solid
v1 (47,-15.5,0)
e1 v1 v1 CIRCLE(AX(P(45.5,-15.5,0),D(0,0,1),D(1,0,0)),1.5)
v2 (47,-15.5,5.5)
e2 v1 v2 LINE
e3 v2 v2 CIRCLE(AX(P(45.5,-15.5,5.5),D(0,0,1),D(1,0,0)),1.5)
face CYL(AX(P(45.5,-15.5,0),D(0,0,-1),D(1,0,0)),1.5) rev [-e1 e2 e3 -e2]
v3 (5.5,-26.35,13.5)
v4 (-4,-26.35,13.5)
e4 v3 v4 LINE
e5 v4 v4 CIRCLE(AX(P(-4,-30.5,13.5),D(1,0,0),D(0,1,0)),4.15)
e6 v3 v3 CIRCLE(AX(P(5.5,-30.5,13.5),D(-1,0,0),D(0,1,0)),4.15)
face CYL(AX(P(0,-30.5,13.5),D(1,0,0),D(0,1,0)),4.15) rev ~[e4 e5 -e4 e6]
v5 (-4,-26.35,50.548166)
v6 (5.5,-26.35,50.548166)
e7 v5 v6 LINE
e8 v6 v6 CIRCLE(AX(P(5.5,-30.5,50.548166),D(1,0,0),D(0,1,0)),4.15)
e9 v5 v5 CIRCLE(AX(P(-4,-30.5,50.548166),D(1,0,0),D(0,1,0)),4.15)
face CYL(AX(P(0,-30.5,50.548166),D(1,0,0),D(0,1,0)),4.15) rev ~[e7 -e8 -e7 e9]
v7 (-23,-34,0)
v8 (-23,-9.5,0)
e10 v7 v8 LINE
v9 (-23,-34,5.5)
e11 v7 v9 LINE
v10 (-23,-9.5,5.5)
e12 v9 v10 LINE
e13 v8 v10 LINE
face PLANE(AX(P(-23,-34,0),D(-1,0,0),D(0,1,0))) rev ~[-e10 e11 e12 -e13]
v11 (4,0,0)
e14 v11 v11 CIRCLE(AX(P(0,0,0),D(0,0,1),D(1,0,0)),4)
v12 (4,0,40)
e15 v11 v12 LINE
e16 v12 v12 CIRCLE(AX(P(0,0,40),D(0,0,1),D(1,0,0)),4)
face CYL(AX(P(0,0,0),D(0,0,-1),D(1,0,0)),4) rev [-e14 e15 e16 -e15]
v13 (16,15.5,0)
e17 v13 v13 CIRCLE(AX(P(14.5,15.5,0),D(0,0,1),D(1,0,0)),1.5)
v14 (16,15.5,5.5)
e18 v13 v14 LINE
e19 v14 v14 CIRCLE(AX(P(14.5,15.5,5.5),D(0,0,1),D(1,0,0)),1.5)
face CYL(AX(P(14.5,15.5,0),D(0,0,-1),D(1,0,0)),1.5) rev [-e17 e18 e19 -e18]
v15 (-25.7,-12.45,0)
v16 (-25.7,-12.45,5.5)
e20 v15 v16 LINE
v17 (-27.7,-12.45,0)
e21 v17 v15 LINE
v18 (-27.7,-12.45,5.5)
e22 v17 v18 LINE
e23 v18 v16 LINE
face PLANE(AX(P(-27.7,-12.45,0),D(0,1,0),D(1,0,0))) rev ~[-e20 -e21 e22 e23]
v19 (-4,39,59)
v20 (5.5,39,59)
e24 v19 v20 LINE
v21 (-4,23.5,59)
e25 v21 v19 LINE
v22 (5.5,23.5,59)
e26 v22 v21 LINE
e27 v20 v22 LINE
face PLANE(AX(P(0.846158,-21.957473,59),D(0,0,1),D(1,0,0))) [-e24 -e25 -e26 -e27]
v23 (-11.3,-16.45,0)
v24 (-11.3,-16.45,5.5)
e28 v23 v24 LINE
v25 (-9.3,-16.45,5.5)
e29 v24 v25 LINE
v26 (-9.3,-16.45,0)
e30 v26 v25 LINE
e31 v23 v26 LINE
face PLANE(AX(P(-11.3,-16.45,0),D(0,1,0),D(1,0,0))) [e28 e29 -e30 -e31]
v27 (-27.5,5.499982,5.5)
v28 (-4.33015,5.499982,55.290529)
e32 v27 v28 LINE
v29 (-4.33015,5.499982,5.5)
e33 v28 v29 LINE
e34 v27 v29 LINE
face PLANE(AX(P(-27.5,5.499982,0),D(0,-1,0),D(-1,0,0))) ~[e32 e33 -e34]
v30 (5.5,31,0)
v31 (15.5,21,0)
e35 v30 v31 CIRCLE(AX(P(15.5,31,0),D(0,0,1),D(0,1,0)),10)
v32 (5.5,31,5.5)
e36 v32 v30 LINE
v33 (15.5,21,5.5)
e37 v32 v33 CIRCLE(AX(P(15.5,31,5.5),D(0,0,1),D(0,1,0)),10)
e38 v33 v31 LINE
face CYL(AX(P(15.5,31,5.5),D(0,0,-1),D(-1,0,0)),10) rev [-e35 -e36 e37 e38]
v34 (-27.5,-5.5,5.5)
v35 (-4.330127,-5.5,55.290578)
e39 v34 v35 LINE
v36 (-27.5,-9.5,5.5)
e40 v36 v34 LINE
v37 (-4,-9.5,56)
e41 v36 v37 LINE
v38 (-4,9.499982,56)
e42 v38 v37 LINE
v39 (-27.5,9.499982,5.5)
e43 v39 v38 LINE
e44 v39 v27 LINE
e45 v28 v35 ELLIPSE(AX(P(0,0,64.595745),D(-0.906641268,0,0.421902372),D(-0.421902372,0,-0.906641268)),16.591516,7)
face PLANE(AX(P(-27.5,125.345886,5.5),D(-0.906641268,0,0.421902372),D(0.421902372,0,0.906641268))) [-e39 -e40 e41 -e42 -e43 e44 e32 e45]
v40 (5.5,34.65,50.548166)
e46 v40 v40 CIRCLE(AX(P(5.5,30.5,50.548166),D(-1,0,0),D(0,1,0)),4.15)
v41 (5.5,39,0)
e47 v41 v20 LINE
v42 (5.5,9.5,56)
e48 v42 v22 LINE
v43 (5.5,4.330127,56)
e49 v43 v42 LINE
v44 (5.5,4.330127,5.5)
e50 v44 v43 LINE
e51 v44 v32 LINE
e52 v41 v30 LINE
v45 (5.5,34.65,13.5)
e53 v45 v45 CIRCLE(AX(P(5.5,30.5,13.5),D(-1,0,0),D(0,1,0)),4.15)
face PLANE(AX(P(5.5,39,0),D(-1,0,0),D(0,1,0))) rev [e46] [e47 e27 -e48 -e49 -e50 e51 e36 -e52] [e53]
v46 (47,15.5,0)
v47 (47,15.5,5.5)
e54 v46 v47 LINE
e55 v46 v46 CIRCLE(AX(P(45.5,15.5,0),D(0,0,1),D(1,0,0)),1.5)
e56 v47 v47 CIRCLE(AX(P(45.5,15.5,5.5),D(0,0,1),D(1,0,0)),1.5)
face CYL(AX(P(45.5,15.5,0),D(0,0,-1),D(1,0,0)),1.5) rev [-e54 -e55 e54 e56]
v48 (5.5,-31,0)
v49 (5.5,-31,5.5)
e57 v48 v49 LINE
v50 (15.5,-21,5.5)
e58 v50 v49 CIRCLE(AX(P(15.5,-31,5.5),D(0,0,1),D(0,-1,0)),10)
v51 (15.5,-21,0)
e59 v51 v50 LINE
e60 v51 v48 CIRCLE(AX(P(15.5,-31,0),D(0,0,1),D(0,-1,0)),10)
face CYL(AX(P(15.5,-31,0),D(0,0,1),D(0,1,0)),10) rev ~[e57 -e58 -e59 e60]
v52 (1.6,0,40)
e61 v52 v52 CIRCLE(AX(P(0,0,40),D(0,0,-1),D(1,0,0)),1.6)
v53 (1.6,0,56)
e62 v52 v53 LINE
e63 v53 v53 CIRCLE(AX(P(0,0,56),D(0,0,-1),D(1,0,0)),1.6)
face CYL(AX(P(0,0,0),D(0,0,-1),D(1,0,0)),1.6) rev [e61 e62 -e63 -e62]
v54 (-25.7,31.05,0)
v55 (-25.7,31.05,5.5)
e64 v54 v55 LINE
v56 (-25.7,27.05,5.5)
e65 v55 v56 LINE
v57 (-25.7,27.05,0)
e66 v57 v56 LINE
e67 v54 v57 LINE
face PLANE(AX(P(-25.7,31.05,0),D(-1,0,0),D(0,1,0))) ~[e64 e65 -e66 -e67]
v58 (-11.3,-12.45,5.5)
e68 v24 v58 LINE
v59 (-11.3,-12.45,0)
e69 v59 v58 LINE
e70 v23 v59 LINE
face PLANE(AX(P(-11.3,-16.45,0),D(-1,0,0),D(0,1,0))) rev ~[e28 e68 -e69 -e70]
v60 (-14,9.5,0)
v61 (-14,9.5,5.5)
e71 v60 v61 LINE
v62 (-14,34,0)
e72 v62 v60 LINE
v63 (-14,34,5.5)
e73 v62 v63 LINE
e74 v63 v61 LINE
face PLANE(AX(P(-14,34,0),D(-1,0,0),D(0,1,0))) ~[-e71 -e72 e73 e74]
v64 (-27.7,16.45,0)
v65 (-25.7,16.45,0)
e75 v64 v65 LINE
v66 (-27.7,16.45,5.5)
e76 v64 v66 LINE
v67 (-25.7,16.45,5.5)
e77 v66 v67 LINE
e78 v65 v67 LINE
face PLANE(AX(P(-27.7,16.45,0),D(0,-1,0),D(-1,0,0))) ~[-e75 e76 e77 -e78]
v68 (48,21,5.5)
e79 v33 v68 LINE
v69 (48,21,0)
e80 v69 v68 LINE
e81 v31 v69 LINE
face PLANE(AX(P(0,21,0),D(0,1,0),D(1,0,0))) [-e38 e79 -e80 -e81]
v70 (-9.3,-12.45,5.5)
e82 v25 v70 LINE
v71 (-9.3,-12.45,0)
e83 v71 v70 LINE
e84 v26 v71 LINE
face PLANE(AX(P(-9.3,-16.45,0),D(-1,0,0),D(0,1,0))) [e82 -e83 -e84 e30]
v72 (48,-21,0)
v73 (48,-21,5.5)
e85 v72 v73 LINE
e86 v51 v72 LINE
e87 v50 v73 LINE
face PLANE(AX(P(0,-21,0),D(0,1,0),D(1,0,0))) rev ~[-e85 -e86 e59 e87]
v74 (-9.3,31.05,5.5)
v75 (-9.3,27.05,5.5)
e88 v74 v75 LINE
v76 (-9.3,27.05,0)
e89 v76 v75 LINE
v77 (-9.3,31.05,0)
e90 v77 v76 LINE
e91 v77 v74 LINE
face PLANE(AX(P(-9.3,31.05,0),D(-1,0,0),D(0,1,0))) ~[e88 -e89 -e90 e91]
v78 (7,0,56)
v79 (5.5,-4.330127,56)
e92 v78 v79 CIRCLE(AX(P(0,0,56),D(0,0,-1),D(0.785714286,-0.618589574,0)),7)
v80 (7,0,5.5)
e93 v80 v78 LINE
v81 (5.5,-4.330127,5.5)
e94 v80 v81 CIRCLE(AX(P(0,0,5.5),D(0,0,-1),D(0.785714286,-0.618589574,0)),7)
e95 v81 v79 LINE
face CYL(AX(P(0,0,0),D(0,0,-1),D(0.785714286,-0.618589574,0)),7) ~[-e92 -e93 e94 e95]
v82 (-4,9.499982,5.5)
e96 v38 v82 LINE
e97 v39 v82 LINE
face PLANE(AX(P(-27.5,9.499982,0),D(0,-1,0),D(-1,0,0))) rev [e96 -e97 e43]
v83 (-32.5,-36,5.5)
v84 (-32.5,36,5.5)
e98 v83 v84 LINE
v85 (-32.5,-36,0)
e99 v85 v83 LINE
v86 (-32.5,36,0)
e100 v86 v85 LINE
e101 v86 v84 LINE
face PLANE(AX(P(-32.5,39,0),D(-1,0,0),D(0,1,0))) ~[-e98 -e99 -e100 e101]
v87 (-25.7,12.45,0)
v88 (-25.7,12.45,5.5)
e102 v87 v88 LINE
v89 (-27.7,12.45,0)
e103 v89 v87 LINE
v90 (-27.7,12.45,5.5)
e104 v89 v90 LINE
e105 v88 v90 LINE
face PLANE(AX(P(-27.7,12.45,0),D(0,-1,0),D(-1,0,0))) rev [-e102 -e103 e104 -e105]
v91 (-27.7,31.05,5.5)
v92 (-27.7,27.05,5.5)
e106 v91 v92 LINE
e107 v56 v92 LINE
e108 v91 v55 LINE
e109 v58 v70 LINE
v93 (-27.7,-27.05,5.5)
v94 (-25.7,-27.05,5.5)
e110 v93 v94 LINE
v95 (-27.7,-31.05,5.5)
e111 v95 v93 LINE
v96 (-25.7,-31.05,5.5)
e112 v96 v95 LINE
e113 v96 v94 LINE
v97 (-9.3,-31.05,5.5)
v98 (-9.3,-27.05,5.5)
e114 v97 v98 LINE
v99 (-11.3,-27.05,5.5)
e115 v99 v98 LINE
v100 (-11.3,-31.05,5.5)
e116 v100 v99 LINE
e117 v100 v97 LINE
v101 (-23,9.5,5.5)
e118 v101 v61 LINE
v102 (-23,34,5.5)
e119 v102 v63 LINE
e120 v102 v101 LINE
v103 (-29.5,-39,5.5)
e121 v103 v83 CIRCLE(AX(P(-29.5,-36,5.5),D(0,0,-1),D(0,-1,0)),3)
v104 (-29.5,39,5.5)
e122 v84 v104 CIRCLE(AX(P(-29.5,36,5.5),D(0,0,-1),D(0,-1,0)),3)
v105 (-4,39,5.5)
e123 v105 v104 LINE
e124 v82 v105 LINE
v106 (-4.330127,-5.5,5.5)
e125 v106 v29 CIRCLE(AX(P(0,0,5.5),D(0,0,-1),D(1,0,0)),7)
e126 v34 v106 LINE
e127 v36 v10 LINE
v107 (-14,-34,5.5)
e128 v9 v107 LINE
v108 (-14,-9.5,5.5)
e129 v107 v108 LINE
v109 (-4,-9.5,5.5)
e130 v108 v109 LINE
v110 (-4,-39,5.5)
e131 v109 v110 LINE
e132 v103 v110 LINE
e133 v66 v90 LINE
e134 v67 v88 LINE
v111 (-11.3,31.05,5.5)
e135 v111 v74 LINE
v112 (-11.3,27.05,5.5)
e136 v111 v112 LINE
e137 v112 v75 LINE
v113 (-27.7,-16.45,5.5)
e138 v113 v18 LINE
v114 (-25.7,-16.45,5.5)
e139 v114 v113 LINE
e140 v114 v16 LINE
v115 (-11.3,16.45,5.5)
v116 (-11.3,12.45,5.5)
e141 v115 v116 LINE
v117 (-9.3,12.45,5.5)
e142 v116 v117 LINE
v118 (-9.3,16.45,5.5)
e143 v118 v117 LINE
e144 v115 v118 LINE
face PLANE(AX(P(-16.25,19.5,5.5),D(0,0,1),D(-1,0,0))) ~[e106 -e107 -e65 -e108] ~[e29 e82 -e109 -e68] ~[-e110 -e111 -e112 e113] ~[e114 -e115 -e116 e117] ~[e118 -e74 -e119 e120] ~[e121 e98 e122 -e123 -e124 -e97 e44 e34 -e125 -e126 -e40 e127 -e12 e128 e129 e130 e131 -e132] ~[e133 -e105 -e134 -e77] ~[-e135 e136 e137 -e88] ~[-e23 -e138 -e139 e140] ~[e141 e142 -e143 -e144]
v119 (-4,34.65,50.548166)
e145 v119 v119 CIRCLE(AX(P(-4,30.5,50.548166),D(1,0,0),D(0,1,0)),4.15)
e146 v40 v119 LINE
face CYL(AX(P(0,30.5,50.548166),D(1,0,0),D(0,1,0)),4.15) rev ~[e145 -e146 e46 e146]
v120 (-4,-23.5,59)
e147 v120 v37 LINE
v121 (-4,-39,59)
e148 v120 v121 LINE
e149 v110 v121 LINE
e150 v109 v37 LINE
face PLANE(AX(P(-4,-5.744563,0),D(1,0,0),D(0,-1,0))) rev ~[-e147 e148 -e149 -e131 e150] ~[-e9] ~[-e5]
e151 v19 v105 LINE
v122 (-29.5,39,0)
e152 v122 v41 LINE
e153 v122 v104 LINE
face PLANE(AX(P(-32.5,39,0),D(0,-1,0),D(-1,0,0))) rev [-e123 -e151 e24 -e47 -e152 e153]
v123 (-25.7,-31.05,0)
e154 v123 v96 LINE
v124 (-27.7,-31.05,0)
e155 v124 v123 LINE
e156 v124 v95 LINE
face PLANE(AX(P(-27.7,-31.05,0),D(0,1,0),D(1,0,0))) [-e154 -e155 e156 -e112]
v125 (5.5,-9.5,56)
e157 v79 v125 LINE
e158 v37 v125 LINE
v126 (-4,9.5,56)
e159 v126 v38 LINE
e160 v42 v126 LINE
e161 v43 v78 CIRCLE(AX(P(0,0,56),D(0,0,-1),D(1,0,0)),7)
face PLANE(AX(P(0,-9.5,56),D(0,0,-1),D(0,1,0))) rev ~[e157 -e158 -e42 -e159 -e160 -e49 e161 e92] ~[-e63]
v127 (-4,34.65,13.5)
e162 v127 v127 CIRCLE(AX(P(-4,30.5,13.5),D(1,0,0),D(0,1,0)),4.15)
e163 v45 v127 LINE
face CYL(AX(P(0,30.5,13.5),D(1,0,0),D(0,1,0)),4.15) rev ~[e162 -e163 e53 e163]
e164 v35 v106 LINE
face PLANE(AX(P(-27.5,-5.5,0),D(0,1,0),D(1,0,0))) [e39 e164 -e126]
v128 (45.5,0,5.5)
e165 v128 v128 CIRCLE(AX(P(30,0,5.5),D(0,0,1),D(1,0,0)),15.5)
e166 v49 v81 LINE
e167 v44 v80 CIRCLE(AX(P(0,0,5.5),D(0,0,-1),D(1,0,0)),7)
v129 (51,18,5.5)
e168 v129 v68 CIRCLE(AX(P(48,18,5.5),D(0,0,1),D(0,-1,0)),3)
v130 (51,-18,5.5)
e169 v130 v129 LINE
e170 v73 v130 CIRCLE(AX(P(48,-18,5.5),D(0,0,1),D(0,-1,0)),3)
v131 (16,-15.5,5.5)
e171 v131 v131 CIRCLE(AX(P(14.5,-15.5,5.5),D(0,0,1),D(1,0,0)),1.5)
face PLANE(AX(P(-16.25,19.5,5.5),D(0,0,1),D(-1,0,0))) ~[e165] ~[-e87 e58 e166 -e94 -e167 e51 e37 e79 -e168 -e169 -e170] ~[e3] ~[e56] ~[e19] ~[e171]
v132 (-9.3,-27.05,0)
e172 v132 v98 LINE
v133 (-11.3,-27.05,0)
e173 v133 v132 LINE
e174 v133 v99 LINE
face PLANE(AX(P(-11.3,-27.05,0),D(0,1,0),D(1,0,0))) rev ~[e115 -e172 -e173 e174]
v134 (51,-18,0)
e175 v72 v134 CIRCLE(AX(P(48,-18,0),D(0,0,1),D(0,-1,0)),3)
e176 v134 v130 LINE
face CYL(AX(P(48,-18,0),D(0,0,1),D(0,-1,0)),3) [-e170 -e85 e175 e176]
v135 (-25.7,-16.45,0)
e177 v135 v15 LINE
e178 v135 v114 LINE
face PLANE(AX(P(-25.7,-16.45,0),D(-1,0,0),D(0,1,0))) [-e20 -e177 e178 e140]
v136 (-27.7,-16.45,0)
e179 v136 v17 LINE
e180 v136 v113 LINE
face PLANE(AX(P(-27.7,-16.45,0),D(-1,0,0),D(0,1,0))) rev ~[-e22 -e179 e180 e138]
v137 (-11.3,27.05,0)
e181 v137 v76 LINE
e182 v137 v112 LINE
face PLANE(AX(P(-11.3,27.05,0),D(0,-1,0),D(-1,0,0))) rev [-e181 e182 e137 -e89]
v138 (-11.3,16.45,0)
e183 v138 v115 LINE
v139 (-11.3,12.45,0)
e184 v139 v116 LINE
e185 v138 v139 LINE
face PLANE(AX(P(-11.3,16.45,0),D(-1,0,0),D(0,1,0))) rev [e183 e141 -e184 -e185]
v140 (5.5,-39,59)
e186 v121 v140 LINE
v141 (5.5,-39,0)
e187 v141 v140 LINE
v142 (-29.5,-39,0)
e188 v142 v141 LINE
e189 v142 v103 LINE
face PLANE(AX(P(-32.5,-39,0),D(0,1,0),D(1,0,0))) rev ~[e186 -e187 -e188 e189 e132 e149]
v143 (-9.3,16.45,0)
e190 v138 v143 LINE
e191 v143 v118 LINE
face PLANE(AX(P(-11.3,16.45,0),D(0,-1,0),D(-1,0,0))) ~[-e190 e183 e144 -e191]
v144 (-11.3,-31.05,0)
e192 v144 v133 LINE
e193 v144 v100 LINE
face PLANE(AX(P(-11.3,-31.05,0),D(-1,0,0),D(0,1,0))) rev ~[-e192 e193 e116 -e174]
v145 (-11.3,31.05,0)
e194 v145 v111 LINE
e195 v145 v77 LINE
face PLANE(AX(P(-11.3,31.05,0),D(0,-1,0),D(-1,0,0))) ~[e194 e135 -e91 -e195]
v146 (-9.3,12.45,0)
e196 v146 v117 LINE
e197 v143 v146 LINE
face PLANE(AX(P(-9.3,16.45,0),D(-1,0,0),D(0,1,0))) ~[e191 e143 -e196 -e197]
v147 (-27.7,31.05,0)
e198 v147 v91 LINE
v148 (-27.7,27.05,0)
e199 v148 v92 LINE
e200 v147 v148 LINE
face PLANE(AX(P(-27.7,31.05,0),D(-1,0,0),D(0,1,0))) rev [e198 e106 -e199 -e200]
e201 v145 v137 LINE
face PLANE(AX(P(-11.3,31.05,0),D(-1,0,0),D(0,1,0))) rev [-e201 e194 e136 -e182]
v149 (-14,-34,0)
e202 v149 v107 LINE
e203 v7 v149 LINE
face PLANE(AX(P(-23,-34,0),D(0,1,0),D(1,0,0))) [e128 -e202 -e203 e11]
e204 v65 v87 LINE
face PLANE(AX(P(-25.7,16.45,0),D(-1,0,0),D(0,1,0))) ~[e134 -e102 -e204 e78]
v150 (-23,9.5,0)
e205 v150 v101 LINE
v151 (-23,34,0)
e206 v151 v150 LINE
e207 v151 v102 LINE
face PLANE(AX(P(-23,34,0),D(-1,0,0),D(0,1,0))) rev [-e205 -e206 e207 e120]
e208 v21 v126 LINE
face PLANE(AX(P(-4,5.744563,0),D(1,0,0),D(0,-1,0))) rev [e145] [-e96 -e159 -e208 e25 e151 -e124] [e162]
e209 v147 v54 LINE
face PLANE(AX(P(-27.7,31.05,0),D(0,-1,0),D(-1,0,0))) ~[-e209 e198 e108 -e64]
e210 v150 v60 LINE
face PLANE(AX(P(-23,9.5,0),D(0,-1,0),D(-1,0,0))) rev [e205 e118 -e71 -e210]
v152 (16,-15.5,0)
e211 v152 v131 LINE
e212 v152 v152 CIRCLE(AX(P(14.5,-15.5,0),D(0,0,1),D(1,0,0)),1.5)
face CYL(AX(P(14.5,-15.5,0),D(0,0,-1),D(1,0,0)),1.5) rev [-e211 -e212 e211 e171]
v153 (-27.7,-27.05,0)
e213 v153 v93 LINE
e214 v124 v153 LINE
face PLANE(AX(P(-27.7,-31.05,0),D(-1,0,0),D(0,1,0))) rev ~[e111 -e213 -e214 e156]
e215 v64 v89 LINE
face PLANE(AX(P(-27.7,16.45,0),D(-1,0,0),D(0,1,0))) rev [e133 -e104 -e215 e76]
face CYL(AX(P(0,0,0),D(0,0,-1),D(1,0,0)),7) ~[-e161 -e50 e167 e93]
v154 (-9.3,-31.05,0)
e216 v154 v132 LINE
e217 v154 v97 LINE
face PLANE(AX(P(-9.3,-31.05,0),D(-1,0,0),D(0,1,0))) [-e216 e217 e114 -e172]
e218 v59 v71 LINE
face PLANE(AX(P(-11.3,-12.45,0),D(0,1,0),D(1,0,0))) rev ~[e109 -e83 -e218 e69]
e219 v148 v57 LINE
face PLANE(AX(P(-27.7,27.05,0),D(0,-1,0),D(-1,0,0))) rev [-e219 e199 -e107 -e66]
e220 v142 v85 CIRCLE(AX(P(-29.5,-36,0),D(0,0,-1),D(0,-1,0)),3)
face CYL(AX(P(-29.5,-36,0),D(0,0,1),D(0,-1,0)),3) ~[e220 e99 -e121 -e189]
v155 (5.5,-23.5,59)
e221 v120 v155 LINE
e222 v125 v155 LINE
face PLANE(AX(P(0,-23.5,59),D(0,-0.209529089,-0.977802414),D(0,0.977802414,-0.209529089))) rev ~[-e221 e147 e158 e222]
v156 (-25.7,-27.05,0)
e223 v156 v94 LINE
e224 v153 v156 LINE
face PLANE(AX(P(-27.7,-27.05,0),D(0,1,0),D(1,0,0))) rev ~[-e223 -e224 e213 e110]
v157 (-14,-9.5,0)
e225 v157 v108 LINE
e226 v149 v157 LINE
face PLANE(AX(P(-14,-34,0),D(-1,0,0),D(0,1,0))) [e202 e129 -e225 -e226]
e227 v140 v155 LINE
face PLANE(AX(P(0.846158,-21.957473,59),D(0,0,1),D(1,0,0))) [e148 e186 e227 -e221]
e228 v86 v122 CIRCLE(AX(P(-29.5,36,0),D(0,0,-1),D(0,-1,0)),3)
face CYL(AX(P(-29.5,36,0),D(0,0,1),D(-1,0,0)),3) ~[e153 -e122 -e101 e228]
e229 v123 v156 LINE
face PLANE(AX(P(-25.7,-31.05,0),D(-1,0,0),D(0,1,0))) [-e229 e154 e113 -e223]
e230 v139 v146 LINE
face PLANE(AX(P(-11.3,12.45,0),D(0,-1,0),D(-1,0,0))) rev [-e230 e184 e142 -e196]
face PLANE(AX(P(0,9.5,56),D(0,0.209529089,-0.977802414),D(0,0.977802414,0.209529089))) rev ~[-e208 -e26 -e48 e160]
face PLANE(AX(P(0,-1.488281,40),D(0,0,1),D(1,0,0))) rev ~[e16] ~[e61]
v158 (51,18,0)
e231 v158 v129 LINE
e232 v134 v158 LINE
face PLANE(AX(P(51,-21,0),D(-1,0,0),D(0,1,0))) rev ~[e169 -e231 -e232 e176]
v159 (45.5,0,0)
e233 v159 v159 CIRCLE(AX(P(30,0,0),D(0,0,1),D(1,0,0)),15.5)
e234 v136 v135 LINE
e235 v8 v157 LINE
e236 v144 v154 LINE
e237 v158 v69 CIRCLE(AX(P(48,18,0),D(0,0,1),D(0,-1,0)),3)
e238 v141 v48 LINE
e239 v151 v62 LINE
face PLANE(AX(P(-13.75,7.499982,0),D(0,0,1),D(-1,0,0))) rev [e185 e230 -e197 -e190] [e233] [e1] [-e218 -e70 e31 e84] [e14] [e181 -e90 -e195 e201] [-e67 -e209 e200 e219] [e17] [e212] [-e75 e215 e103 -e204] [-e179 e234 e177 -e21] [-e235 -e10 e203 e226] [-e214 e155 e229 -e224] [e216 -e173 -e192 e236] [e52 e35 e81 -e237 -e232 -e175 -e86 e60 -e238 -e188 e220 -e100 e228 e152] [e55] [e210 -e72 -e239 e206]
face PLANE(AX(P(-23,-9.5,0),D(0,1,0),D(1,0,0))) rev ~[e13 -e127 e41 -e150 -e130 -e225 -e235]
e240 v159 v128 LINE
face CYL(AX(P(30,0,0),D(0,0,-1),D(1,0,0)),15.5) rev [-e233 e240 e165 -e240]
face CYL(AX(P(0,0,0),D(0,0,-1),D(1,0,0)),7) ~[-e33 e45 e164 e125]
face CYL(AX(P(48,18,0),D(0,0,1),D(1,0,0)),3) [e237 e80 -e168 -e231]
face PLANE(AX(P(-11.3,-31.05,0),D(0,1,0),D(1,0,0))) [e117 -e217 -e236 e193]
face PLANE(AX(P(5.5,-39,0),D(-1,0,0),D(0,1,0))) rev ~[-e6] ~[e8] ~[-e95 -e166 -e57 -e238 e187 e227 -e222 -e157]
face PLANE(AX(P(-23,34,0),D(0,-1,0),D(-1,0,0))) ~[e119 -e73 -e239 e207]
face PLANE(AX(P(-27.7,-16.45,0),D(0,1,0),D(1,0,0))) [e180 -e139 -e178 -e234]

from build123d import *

# Parameters (mm, degrees)
F0_W         = 51
F0_H         = 42
F0_R         = 1.5
F0_R_2       = 15.5
F4_DEPTH     = 5.5
F1_W         = 32.5
F1_H         = 39
F1_W_2       = 2
F1_H_2       = 4
F1_W_3       = 9
F1_H_3       = 24.5
F5_DEPTH     = 5.5
F6_DEPTH     = 59
F3_W         = 27.5
F3_H         = 4
F7_DEPTH     = 56
F8_R         = 4.15
F9_DEPTH     = 6
F10_DEPTH    = 40
F11_DEPTH    = 153
F12_R        = 10
F13_R        = 3
F15_DEPTH    = 10.56991
F16_T4_DEPTH = 265.6917724847
F16_T9_DEPTH = 265.6917724847


# Not quite as in the source:
# - a fillet or chamfer that OpenCascade refuses, or shapes differently, is made with other operations: its cross-section is extruded or revolved along the edge and cut away or added
# - an extrude ends at something that could not be found from the text; its depth is read off the source's solid
# - a pattern or mirror of a feature is missing from the dataset's text; its kind, count and spacing are read off the source's solid


with BuildPart() as f4:
    # F0 (on Top) → F4 (new body)
    with BuildSketch(Plane.XY):
        with Locations((25.5, 0)):
            Rectangle(F0_W, F0_H)
        with Locations((14.5, -15.5)):
            Circle(F0_R, mode=Mode.SUBTRACT)
        with Locations((45.5, -15.5)):
            Circle(F0_R, mode=Mode.SUBTRACT)
        with Locations((14.5, 15.5)):
            Circle(F0_R, mode=Mode.SUBTRACT)
        with Locations((30, 0)):
            Circle(F0_R_2, mode=Mode.SUBTRACT)
        with Locations((45.5, 15.5)):
            Circle(F0_R, mode=Mode.SUBTRACT)
    extrude(amount=F4_DEPTH)

    # F1 (on Top) → F5 (join, through all)
    with BuildSketch(Plane.XY):
        with Locations((-16.25, -19.5)):
            Rectangle(F1_W, F1_H)
        with Locations((-26.7, -29.05)):
            Rectangle(F1_W_2, F1_H_2, mode=Mode.SUBTRACT)
        with Locations((-18.5, -21.75)):
            Rectangle(F1_W_3, F1_H_3, mode=Mode.SUBTRACT)
        with Locations((-10.3, -29.05)):
            Rectangle(F1_W_2, F1_H_2, mode=Mode.SUBTRACT)
        with Locations((-26.7, -14.45)):
            Rectangle(F1_W_2, F1_H_2, mode=Mode.SUBTRACT)
        with Locations((-10.3, -14.45)):
            Rectangle(F1_W_2, F1_H_2, mode=Mode.SUBTRACT)
    f5 = extrude(amount=F5_DEPTH)

    # F5_copies: F5 across plane
    add(f5.mirror(Plane.ZX))

    # F2 (on Top) → F6 (join)
    with BuildSketch(Plane.XY):
        with BuildLine():
            ThreePointArc((5.5, -4.3301270189), (1.0308525773, -6.9236798716), (-4, -5.7445626465))
            Line((-4, -5.7445626465), (-4, -39))
            Line((-4, -39), (5.5, -39))
            Line((5.5, -39), (5.5, -4.3301270189))
        make_face()
        with BuildLine():
            Line((-4, 0), (-4, -5.7445626465))
            ThreePointArc((-4, -5.7445626465), (1.0308525773, -6.9236798716), (5.5, -4.3301270189))
            Line((5.5, -4.3301270189), (5.5, 0))
            Line((5.5, 0), (4, 0))
            ThreePointArc((4, 0), (0, -4), (-4, 0))
        make_face()
        with BuildLine():
            ThreePointArc((5.5, -4.3301270189), (6.6143782777, -2.2912878475), (7, 0))
            ThreePointArc((7, 0), (-3.2403703492, 6.204836823), (-4, -5.7445626465))
            Line((-4, -5.7445626465), (-4, 0))
            ThreePointArc((-4, 0), (0, 4), (4, 0))
            Line((4, 0), (5.5, 0))
            Line((5.5, 0), (5.5, -4.3301270189))
        make_face()
        with BuildLine():
            Line((-1.6, 0), (-4, 0))
            ThreePointArc((-4, 0), (0, -4), (4, 0))
            Line((4, 0), (1.6, 0))
            ThreePointArc((1.6, 0), (0, -1.6), (-1.6, 0))
        make_face()
        with BuildLine():
            ThreePointArc((4, 0), (0, 4), (-4, 0))
            Line((-4, 0), (-1.6, 0))
            ThreePointArc((-1.6, 0), (0, 1.6), (1.6, 0))
            Line((1.6, 0), (4, 0))
        make_face()
        with BuildLine():
            ThreePointArc((1.6, 0), (0, 1.6), (-1.6, 0))
            Line((-1.6, 0), (1.6, 0))
        make_face()
        with BuildLine():
            Line((1.6, 0), (-1.6, 0))
            ThreePointArc((-1.6, 0), (0, -1.6), (1.6, 0))
        make_face()
    f6 = extrude(amount=F6_DEPTH)

    # F6_copies: F6 across plane
    add(f6.mirror(Plane.ZX))

    # F3 (on Top) → F7 (join)
    with BuildSketch(Plane.XY):
        with Locations((-13.75, -7.5)):
            Rectangle(F3_W, F3_H)
    f7 = extrude(amount=F7_DEPTH)

    # F7_copies: F7 across plane
    add(f7.mirror(Plane.ZX.offset(-9e-06)))

    # F8 (on Right) → F9 (cut, symmetric)
    with BuildSketch(Plane.YZ):
        with Locations((30.5, 50.5481660366)):
            Circle(F8_R)
        with Locations((30.5, 13.5)):
            Circle(F8_R)
        with Locations((-30.5, 13.5)):
            Circle(F8_R)
        with Locations((-30.5, 50.5481660366)):
            Circle(F8_R)
    extrude(amount=F9_DEPTH, both=True, mode=Mode.SUBTRACT)

    # F2 (on Top) → F10 (cut)
    with BuildSketch(Plane.XY):
        with BuildLine():
            Line((-1.6, 0), (-4, 0))
            ThreePointArc((-4, 0), (0, -4), (4, 0))
            Line((4, 0), (1.6, 0))
            ThreePointArc((1.6, 0), (0, -1.6), (-1.6, 0))
        make_face()
        with BuildLine():
            ThreePointArc((4, 0), (0, 4), (-4, 0))
            Line((-4, 0), (-1.6, 0))
            ThreePointArc((-1.6, 0), (0, 1.6), (1.6, 0))
            Line((1.6, 0), (4, 0))
        make_face()
        with BuildLine():
            ThreePointArc((1.6, 0), (0, 1.6), (-1.6, 0))
            Line((-1.6, 0), (1.6, 0))
        make_face()
        with BuildLine():
            Line((1.6, 0), (-1.6, 0))
            ThreePointArc((-1.6, 0), (0, -1.6), (1.6, 0))
        make_face()
    extrude(amount=F10_DEPTH, mode=Mode.SUBTRACT)

    # F2 (on Top) → F11 (cut, through all)
    with BuildSketch(Plane.XY):
        with BuildLine():
            Line((1.6, 0), (-1.6, 0))
            ThreePointArc((-1.6, 0), (0, -1.6), (1.6, 0))
        make_face()
        with BuildLine():
            ThreePointArc((1.6, 0), (0, 1.6), (-1.6, 0))
            Line((-1.6, 0), (1.6, 0))
        make_face()
    extrude(amount=F11_DEPTH, mode=Mode.SUBTRACT)

    # F12
    f12_edges = [f4.edges().sort_by_distance(p)[0] for p in [
        (5.5, -21, 2.75),
        (5.5, 21, 2.75),
    ]]
    fillet(f12_edges, radius=F12_R)

    # F13
    f13_edges = [f4.edges().sort_by_distance(p)[0] for p in [
        (51, 21, 2.75),
        (51, -21, 2.75),
        (-32.5, -39, 2.75),
        (-32.5, 39, 2.75),
    ]]
    fillet(f13_edges, radius=F13_R)

    # F14 (on Right) → F15 (cut, symmetric)
    with BuildSketch(Plane.YZ):
        Polygon((23.5, 59), (-23.5, 59), (-9.5, 56), (9.5, 56), align=None)
    extrude(amount=F15_DEPTH, both=True, mode=Mode.SUBTRACT)

    # F16: chamfer of 23.5 x 50.5 on 2 edges, made by hand


with BuildPart() as f16_tool2:
    # F16_s3 → F16_t4 (new body)
    with BuildSketch(Plane.XZ.offset(-125.3458862424)):
        Polygon((-27.5, 5.5), (-4, 56), (-27.5, 56), align=None)
    extrude(amount=F16_T4_DEPTH)

    split(bisect_by=Plane.XY.offset(5.5), keep=Keep.TOP)


with BuildPart() as f4_1:
    add(f4.part)

    # F16_t1: cut F16_tool2
    add(f16_tool2.part, mode=Mode.SUBTRACT)


with BuildPart() as f16_tool7:
    # F16_s8 → F16_t9 (new body)
    with BuildSketch(Plane.XZ.offset(125.3459042424)):
        Polygon((-27.5, 5.5), (-4, 56), (-27.5, 56), align=None)
    extrude(amount=-F16_T9_DEPTH)

    split(bisect_by=Plane.XY.offset(5.5), keep=Keep.TOP)


with BuildPart() as f4_2:
    add(f4_1.part)

    # F16_t6: cut F16_tool7
    add(f16_tool7.part, mode=Mode.SUBTRACT)


solid = f4_2.part
